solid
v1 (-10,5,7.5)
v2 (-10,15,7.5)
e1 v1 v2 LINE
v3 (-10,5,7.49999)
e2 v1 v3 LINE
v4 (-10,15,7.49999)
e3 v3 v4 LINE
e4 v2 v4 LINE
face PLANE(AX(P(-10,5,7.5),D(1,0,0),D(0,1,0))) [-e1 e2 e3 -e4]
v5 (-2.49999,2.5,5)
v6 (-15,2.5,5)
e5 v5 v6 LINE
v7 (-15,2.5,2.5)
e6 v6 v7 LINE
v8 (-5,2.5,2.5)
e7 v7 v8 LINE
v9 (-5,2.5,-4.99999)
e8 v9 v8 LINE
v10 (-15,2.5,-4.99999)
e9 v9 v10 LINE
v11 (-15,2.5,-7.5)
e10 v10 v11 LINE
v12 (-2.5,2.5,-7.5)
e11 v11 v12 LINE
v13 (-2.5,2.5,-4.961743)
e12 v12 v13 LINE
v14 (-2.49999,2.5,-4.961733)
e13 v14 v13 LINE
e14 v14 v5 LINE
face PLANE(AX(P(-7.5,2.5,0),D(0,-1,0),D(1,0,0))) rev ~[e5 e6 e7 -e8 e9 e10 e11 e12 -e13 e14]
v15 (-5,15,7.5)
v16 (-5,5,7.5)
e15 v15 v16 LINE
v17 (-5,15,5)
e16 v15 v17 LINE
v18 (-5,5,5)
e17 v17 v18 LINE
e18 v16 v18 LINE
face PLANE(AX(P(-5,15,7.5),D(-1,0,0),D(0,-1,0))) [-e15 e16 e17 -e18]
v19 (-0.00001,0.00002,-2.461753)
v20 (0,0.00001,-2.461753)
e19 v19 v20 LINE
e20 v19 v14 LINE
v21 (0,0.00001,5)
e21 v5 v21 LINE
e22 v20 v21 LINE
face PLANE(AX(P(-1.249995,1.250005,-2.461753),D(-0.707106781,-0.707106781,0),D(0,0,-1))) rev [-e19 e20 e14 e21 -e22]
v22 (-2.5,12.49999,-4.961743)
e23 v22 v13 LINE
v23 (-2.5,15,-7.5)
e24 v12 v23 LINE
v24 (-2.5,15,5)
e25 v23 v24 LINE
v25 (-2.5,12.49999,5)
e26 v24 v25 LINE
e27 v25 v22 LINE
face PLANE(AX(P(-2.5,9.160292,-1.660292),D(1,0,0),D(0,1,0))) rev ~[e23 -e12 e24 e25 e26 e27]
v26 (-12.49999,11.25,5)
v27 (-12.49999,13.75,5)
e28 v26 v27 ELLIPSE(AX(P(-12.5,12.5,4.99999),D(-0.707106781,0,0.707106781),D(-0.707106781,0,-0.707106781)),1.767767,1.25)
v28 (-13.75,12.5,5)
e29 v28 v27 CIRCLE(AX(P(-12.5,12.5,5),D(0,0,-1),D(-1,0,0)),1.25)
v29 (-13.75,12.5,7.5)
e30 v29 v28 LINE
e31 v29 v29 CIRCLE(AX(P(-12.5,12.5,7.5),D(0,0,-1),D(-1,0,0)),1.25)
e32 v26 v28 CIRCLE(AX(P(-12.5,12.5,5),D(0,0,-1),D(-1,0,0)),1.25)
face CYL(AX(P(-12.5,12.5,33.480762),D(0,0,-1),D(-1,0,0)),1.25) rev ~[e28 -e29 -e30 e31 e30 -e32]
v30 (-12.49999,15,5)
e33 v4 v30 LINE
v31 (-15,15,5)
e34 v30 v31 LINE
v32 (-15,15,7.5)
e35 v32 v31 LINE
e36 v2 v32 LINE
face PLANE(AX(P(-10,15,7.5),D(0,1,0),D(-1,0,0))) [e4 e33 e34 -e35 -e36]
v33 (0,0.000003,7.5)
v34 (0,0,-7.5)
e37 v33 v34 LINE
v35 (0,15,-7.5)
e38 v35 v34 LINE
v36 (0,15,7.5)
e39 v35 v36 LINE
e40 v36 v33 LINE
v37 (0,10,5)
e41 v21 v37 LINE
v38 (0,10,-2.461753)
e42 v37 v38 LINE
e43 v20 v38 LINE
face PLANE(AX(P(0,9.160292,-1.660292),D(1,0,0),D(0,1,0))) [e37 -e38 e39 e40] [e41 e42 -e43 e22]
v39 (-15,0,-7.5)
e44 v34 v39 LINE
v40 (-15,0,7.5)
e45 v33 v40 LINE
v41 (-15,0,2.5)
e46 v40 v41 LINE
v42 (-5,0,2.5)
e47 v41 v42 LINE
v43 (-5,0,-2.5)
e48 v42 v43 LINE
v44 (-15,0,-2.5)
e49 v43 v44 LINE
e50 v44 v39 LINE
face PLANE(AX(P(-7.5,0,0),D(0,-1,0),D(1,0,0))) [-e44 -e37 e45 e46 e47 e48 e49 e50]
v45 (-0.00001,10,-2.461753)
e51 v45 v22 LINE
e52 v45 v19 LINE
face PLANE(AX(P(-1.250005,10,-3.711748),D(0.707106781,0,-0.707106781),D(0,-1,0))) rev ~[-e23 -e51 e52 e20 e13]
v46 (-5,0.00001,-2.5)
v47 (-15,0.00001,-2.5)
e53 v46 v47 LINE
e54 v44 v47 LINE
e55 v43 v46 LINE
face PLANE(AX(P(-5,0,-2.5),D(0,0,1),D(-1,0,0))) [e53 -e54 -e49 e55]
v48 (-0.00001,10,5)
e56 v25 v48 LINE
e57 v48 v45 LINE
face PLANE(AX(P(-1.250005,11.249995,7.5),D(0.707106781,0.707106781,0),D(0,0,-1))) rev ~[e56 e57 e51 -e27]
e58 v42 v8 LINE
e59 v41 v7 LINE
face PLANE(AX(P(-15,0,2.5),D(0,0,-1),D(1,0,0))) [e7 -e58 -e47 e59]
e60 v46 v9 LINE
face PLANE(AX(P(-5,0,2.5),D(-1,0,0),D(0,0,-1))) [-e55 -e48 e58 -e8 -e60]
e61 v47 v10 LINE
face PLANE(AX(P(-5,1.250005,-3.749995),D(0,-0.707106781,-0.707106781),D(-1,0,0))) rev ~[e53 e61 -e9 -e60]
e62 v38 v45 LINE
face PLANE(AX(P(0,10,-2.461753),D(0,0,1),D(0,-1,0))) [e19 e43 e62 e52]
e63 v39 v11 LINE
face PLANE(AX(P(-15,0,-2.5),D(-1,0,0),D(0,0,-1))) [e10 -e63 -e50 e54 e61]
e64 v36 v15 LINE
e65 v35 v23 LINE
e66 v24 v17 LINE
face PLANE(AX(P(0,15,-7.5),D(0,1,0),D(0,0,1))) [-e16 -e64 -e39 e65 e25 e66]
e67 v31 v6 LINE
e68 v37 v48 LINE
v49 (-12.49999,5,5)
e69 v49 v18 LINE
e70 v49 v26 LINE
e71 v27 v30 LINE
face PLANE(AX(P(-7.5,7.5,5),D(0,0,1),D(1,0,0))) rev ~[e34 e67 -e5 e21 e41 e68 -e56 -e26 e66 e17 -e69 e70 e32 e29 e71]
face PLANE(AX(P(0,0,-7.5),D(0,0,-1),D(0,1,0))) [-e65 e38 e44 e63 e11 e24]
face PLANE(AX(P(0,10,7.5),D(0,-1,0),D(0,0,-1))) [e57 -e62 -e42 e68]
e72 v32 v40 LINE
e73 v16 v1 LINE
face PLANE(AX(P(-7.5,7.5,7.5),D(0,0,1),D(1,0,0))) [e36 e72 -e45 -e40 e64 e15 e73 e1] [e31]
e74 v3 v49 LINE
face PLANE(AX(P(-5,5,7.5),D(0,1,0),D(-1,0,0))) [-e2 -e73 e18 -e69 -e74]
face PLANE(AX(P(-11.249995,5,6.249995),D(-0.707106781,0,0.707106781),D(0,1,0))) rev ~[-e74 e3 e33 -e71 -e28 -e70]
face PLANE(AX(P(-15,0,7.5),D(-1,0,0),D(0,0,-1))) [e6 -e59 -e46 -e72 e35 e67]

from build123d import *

# Parameters (mm, degrees)
F2_DEPTH = 2.5
F3_DEPTH = 2.5
F4_SIZE  = 2.49999
F8_DEPTH = 2.5
F9_SIZE  = 2.49999
F10_D    = 2.5


# Not quite as in the source:
# - a fillet or chamfer is up to 0.001 mm smaller than in the source, because OpenCascade refuses the exact size
# - a feature of the source that left no trace in its solid (it failed there, or was rolled back) is left out


with BuildPart() as f2:
    # F0 (on Front) → F2 (new body)
    with BuildSketch(Plane.XZ):
        Polygon((0, 7.5), (-15, 7.5), (-15, 2.5), (-5, 2.5), (-5, -2.5), (-15, -2.5), (-15, -7.5), (0, -7.5), align=None)
    extrude(amount=-F2_DEPTH)

    # F1 (on Right) → F3 (join)
    with BuildSketch(Plane.YZ):
        Polygon((15, -7.5), (15, -2.4617532641), (15, 5), (15, 7.5), (10, 7.5), (10, 5), (10, -2.4617532641), (0, -2.4617532641), (0, -7.5), align=None)
    extrude(amount=-F3_DEPTH)

    # F4 (call 1 of 3: OpenCascade refuses the feature's edges together) (size 2.5 in the source; OpenCascade refuses exactly that, so slightly less here)
    f4_edges = [f2.edges().sort_by_distance(p)[0] for p in [
        (0, 2.5, 2.519123),
    ]]
    chamfer(f4_edges, length=F4_SIZE)

    # F4#2 (call 2 of 3) (size 2.5 in the source; OpenCascade refuses exactly that, so slightly less here)
    f4_2_edges = [f2.edges().sort_by_distance(p)[0] for p in [
        (-10, 2.5, -2.5),
    ]]
    chamfer(f4_2_edges, length=F4_SIZE)

    # F4#3 (call 3 of 3) (size 2.5 in the source; OpenCascade refuses exactly that, so slightly less here)
    f4_3_edges = [f2.edges().sort_by_distance(p)[0] for p in [
        (-2.5, 10, 2.519123),
        (-2.5, 6.25, -2.461753),
    ]]
    chamfer(f4_3_edges, length=F4_SIZE)

    # F7 (on offset) → F8 (join)
    with BuildSketch(Plane.XY.offset(7.5)):
        Polygon((0, 0), (0, 15), (-5, 15), (-5, 5), (-10, 5), (-10, 15), (-15, 15), (-15, 0), align=None)
    extrude(amount=-F8_DEPTH)

    # F9 (size 2.5 in the source; OpenCascade refuses exactly that, so slightly less here)
    f9_edges = [f2.edges().sort_by_distance(p)[0] for p in [
        (-10, 10, 5),
    ]]
    chamfer(f9_edges, length=F9_SIZE)

    # F10 (through all)
    with Locations(Plane.XY.offset(7.5)):
        with Locations((-12.5, 12.5)):
            Hole(F10_D / 2)


solid = f2.part
